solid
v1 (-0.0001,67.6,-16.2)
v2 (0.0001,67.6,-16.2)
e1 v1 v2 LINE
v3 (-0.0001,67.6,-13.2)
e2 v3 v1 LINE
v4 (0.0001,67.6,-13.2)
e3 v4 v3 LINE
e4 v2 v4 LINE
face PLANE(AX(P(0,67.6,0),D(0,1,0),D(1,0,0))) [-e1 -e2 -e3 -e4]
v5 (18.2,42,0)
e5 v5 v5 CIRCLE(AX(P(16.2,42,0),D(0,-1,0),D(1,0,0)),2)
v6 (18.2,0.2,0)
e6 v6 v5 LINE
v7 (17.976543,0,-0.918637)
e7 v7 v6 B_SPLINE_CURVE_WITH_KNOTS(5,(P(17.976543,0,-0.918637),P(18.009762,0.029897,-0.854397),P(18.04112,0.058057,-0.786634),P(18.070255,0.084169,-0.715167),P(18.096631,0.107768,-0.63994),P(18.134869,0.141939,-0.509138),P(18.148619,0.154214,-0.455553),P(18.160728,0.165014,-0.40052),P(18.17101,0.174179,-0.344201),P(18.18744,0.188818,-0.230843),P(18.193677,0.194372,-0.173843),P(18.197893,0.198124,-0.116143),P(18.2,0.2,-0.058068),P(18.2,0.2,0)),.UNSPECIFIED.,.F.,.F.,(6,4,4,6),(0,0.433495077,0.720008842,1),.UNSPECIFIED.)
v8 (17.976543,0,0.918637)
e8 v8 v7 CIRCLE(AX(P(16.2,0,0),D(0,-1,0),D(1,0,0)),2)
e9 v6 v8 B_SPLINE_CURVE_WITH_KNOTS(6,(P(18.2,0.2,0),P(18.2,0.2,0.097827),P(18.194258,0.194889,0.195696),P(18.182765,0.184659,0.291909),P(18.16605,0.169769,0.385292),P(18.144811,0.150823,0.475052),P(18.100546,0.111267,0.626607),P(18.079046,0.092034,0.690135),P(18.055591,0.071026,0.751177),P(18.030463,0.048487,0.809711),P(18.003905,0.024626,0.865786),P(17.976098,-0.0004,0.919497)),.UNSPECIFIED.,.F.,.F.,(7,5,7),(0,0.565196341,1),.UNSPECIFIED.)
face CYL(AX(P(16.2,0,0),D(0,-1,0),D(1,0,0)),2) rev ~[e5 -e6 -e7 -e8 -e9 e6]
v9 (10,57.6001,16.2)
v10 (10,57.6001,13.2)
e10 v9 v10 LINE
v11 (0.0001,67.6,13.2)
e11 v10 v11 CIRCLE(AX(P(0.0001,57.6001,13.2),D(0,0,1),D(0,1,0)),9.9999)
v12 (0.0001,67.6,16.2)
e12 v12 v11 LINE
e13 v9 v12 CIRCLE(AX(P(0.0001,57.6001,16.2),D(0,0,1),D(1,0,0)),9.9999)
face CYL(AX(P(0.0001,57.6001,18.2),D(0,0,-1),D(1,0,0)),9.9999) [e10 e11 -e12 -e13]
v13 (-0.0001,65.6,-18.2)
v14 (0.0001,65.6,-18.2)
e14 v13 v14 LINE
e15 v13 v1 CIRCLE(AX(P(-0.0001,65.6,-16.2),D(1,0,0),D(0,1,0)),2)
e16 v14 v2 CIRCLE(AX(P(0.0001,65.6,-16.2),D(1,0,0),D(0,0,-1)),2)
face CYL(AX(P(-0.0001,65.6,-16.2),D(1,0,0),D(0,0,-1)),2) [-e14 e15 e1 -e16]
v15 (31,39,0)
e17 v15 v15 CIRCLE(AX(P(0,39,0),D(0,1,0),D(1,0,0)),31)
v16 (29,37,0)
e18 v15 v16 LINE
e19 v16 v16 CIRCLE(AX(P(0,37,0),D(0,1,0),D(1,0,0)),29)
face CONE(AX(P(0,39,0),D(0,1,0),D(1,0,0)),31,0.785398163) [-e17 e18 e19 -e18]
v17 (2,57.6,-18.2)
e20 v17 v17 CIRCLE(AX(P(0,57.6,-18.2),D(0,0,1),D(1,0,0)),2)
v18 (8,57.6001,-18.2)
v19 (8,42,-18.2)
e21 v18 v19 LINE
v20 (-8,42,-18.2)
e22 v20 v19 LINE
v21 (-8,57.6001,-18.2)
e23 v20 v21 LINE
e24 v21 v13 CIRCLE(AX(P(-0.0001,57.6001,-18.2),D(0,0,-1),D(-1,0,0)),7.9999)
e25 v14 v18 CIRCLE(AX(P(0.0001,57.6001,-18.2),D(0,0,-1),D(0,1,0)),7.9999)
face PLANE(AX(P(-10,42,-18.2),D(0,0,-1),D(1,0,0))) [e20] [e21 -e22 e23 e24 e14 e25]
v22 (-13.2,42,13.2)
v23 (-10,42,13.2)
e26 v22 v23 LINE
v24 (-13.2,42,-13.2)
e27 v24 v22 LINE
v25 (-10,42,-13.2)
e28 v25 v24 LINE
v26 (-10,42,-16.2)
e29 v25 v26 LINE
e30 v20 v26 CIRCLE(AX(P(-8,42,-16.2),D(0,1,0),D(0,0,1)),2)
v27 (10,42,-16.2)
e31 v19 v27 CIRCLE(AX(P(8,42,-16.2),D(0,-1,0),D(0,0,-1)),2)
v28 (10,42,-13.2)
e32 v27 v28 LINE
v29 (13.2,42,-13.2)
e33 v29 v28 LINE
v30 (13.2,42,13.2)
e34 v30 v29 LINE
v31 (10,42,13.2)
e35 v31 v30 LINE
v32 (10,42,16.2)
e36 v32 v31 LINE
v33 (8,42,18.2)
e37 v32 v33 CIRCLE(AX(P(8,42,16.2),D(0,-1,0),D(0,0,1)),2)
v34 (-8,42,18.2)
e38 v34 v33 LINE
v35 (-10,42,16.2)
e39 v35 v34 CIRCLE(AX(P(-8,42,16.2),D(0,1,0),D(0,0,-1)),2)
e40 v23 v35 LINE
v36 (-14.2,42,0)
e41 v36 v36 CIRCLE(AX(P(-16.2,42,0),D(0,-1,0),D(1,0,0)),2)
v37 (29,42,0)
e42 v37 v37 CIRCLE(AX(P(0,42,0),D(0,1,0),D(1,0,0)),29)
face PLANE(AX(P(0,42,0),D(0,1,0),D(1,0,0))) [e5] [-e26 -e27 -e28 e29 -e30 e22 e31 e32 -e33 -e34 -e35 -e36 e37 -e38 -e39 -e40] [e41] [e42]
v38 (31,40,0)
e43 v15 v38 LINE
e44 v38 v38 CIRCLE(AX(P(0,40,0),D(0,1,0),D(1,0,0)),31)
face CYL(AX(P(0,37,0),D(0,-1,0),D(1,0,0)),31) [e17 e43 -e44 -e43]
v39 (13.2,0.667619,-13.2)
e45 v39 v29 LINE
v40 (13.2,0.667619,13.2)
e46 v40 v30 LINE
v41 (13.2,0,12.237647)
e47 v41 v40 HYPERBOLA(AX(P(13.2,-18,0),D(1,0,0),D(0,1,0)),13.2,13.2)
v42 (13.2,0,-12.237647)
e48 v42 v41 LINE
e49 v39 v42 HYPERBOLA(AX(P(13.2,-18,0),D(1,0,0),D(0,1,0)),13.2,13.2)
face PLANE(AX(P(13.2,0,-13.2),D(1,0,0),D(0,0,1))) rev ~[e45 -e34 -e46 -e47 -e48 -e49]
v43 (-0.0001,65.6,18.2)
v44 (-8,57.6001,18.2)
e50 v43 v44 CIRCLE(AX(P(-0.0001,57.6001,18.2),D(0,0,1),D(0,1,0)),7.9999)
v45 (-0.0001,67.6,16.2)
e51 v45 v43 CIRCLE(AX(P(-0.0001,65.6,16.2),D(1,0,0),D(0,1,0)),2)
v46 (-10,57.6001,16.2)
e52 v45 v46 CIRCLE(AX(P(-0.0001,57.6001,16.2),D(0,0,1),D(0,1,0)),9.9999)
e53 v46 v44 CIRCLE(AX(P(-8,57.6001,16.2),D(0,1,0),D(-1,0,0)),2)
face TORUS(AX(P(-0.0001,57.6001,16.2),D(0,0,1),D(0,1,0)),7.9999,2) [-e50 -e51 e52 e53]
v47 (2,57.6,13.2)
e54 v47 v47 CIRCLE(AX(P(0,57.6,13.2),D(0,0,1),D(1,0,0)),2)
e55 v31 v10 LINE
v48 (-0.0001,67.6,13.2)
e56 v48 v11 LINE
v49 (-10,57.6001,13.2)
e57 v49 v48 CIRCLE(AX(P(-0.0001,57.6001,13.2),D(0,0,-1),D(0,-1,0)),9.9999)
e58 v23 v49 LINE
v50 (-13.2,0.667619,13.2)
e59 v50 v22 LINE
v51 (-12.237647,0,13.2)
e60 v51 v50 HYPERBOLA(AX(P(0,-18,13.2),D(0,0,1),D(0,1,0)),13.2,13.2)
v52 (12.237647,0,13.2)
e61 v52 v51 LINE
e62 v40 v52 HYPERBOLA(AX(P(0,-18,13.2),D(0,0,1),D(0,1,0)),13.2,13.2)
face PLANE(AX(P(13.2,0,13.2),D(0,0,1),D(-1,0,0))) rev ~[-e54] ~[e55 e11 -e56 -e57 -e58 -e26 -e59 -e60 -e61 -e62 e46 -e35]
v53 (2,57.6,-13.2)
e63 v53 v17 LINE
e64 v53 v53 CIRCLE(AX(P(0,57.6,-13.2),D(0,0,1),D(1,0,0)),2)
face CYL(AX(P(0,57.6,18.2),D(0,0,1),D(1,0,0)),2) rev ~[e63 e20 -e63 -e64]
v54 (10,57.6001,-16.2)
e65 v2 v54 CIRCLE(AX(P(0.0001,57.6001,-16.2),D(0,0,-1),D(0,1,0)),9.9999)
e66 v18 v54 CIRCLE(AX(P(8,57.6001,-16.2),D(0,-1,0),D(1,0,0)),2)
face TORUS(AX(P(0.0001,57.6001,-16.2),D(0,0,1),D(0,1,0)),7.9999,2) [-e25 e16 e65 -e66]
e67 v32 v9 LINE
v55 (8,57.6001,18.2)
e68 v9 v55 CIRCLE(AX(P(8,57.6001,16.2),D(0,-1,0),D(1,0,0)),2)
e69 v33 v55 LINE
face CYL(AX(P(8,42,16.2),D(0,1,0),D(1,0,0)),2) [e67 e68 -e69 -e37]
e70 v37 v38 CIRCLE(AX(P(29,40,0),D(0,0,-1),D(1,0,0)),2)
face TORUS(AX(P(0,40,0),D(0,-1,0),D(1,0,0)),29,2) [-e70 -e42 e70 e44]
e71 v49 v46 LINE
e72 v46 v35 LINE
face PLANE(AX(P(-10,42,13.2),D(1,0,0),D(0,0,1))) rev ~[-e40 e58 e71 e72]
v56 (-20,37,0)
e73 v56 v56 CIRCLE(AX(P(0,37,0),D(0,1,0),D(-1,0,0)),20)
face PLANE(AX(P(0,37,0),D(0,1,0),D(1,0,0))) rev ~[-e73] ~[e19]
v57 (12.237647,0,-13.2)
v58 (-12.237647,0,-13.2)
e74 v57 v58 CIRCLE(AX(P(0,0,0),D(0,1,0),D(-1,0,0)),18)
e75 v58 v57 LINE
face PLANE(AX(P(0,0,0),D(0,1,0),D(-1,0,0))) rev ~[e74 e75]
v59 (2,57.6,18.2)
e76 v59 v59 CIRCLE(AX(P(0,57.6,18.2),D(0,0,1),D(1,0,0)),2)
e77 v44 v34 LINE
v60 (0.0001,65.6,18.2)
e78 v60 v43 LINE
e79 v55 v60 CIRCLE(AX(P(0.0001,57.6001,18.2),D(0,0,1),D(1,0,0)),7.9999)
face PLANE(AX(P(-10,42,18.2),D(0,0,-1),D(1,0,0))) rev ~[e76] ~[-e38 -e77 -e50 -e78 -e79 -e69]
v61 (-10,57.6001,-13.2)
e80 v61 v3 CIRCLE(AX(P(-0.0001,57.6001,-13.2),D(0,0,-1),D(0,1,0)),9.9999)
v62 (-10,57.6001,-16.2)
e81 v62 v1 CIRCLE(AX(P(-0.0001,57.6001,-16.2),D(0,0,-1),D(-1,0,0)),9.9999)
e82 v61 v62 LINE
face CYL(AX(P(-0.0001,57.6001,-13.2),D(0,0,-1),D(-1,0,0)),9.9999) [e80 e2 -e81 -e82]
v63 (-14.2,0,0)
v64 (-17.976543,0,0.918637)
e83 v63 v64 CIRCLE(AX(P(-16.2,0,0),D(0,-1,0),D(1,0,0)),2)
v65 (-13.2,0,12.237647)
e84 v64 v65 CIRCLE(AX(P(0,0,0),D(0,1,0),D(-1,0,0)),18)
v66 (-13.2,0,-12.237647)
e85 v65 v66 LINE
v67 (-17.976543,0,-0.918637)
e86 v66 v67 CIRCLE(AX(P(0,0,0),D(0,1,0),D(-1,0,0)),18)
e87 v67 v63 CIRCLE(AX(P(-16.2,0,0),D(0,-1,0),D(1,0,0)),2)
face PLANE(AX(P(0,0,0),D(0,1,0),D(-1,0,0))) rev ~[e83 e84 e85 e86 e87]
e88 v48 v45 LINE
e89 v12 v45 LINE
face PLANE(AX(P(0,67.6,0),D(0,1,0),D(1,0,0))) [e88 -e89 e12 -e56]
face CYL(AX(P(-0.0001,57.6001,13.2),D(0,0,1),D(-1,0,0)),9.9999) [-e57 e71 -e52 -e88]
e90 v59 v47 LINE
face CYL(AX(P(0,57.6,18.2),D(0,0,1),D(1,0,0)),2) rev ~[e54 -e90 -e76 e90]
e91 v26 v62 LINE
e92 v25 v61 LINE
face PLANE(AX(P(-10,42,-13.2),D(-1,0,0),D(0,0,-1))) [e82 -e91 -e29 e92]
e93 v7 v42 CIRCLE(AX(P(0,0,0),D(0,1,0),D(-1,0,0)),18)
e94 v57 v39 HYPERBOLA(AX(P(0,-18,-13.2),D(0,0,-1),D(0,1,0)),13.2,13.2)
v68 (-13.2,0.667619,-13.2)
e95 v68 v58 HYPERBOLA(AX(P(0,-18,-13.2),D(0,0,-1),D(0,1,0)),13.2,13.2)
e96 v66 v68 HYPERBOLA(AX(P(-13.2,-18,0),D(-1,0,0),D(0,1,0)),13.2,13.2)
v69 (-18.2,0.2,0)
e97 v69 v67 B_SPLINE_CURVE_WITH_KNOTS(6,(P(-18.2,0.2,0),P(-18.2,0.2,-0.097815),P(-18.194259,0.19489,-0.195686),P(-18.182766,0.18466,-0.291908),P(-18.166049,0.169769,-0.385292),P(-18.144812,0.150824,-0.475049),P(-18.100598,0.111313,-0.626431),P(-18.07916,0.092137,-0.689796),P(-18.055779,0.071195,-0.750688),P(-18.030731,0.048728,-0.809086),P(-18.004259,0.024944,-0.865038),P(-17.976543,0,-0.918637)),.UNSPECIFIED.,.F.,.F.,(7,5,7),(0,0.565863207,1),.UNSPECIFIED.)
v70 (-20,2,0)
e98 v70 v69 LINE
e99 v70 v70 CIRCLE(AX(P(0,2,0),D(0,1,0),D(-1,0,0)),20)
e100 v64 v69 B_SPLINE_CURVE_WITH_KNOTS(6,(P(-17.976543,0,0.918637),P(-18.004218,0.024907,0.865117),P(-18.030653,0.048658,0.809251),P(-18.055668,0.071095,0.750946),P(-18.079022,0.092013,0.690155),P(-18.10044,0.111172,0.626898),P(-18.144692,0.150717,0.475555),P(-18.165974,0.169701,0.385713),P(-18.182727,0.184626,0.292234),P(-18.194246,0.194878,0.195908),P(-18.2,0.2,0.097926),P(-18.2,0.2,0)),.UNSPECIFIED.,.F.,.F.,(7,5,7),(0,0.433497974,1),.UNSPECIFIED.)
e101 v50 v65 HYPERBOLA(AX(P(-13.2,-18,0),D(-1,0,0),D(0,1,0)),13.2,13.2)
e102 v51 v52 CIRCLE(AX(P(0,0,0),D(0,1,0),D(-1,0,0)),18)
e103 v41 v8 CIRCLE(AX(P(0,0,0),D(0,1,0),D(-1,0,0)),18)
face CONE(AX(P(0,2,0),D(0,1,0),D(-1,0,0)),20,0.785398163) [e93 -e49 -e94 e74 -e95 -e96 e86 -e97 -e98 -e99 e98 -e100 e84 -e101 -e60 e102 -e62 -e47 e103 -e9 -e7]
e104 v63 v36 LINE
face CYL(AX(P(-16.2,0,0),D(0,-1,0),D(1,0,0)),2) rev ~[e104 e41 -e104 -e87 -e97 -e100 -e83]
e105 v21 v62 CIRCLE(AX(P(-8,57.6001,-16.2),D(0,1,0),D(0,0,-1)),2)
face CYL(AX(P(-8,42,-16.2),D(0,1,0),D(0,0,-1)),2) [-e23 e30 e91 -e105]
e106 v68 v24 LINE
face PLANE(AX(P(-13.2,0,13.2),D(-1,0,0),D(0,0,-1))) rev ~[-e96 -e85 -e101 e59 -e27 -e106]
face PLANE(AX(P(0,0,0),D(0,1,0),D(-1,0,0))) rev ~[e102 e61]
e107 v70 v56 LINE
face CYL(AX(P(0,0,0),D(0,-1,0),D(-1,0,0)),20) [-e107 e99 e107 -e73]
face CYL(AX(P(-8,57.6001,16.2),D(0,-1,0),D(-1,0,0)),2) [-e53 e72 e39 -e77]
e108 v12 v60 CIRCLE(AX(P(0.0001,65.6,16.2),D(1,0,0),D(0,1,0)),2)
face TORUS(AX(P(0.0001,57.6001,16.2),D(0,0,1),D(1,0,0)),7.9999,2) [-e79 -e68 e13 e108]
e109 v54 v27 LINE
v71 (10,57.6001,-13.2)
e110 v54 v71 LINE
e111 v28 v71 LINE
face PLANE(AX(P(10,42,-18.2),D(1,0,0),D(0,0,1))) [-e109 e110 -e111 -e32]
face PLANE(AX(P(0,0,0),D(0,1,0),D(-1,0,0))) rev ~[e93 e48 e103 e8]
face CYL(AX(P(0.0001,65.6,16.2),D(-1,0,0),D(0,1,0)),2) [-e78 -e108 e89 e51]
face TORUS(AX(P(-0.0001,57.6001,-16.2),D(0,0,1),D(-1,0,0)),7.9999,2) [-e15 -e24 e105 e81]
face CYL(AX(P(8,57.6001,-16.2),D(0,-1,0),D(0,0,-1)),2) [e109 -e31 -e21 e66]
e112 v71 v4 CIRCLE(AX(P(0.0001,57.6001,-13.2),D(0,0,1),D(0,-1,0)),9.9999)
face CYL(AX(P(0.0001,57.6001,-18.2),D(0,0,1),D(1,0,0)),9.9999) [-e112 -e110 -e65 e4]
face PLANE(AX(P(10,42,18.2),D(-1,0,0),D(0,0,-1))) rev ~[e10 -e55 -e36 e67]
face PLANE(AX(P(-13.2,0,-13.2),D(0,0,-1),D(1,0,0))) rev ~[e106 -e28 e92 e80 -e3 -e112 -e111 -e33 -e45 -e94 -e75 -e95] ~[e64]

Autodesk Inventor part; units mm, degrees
ref_plane "YZ Plane" through (0, 0, 0) normal (1, 0, 0) x (0, 1, 0)
ref_plane "XZ Plane" through (0, 0, 0) normal (0, 1, 0) x (-1, 0, 0)
ref_plane "XY Plane" through (0, 0, 0) normal (0, 0, 1) x (1, 0, 0)
sketch "Sketch1" plane through (0, 0, 0) normal (0, 1, 0) x (-1, 0, 0)
  circle A0 centre (0, 0) radius 20
  dimension "d0" = 40
extrude "Extrusion1" add sketch "Sketch1" along normal blind 37
sketch "Sketch2" plane through (0, 37, 0) normal (0, 1, 0) x (1, 0, 0)
  circle A0 centre (0, 0) radius 31
  dimension "d3" = 62
extrude "Extrusion2" add sketch "Sketch2" along normal blind 5
chamfer "Chamfer1" distance 2 angle 45 1 edges at (20, 0, 0)
sketch "Sketch3" plane through (0, 0, 0) normal (0, -1, 0) x (1, 0, 0)
  line L0 (13.2, 13.2) -> (-13.2, 13.2)
  line L1 (-13.2, 13.2) -> (-13.2, -13.2)
  line L2 (-13.2, -13.2) -> (13.2, -13.2)
  line L3 (13.2, -13.2) -> (13.2, 13.2)
  point P0 (0, 0)
  dimension "d9" = 26.4
  dimension "d10" = 26.4
extrude "Extrusion3" cut sketch "Sketch3" against normal blind 50
sketch "Sketch4" plane through (0, 0, 0) normal (0, -1, 0) x (1, 0, 0)
  circle A0 centre (16.2, 0) radius 2
  circle A1 centre (-16.2, 0) radius 2
  point P0 (0, 0)
  dimension "d13" = 4
  dimension "d14" = 4
extrude "Extrusion4" cut sketch "Sketch4" against normal blind 50
sketch "Sketch5" plane through (0, 42, 0) normal (0, 1, 0) x (1, 0, 0)
  line L0 (12.2376, 13.2) -> (-12.2376, 13.2) projected
  line L1 (10, 13.2) -> (-10, 13.2)
  line L2 (-10, 13.2) -> (-10, 18.2)
  line L3 (-10, 18.2) -> (10, 18.2)
  line L4 (10, 18.2) -> (10, 13.2)
  line L5 (-12.2376, -13.2) -> (12.2376, -13.2) projected
  line L6 (10, -13.2) -> (-10, -13.2)
  line L7 (-10, -13.2) -> (-10, -18.2)
  line L8 (-10, -18.2) -> (10, -18.2)
  line L9 (10, -18.2) -> (10, -13.2)
  point P0 (0, 0)
  dimension "d17" = 20
  dimension "d18" = 5
  dimension "d19" = 20
  dimension "d20" = 5
extrude "Extrusion5" add sketch "Sketch5" along normal blind 25.6
fillet "Fillet1" radius 10 4 edges at (10, 67.6, -15.7) (-10, 67.6, -15.7) (10, 67.6, 15.7) (-10, 67.6, 15.7)
sketch "Sketch6" plane through (-10, 42, 18.2) normal (0, 0, 1) x (1, 0, 0)
  circle A0 centre (10, 15.6) radius 2
  line L0 (20, 0) -> (0, 0) projected
  point P0 (10, -42)
  dimension "d24" = 4
  dimension "d31" = 15.6
extrude "Extrusion6" cut sketch "Sketch6" against normal blind 50
fillet "Fillet2" radius 2 7 edges at (-31, 42, 0) (10, 49.8, 18.2) (-10, 49.8, 18.2) (7.0711, 64.6711, 18.2) (-10, 49.8, -18.2) (10, 49.8, -18.2) (7.0711, 64.6711, -18.2)
chamfer "Chamfer2" distance 2 angle 45 1 edges at (-31, 37, 0)
properties part number "bigSpringMountT"
